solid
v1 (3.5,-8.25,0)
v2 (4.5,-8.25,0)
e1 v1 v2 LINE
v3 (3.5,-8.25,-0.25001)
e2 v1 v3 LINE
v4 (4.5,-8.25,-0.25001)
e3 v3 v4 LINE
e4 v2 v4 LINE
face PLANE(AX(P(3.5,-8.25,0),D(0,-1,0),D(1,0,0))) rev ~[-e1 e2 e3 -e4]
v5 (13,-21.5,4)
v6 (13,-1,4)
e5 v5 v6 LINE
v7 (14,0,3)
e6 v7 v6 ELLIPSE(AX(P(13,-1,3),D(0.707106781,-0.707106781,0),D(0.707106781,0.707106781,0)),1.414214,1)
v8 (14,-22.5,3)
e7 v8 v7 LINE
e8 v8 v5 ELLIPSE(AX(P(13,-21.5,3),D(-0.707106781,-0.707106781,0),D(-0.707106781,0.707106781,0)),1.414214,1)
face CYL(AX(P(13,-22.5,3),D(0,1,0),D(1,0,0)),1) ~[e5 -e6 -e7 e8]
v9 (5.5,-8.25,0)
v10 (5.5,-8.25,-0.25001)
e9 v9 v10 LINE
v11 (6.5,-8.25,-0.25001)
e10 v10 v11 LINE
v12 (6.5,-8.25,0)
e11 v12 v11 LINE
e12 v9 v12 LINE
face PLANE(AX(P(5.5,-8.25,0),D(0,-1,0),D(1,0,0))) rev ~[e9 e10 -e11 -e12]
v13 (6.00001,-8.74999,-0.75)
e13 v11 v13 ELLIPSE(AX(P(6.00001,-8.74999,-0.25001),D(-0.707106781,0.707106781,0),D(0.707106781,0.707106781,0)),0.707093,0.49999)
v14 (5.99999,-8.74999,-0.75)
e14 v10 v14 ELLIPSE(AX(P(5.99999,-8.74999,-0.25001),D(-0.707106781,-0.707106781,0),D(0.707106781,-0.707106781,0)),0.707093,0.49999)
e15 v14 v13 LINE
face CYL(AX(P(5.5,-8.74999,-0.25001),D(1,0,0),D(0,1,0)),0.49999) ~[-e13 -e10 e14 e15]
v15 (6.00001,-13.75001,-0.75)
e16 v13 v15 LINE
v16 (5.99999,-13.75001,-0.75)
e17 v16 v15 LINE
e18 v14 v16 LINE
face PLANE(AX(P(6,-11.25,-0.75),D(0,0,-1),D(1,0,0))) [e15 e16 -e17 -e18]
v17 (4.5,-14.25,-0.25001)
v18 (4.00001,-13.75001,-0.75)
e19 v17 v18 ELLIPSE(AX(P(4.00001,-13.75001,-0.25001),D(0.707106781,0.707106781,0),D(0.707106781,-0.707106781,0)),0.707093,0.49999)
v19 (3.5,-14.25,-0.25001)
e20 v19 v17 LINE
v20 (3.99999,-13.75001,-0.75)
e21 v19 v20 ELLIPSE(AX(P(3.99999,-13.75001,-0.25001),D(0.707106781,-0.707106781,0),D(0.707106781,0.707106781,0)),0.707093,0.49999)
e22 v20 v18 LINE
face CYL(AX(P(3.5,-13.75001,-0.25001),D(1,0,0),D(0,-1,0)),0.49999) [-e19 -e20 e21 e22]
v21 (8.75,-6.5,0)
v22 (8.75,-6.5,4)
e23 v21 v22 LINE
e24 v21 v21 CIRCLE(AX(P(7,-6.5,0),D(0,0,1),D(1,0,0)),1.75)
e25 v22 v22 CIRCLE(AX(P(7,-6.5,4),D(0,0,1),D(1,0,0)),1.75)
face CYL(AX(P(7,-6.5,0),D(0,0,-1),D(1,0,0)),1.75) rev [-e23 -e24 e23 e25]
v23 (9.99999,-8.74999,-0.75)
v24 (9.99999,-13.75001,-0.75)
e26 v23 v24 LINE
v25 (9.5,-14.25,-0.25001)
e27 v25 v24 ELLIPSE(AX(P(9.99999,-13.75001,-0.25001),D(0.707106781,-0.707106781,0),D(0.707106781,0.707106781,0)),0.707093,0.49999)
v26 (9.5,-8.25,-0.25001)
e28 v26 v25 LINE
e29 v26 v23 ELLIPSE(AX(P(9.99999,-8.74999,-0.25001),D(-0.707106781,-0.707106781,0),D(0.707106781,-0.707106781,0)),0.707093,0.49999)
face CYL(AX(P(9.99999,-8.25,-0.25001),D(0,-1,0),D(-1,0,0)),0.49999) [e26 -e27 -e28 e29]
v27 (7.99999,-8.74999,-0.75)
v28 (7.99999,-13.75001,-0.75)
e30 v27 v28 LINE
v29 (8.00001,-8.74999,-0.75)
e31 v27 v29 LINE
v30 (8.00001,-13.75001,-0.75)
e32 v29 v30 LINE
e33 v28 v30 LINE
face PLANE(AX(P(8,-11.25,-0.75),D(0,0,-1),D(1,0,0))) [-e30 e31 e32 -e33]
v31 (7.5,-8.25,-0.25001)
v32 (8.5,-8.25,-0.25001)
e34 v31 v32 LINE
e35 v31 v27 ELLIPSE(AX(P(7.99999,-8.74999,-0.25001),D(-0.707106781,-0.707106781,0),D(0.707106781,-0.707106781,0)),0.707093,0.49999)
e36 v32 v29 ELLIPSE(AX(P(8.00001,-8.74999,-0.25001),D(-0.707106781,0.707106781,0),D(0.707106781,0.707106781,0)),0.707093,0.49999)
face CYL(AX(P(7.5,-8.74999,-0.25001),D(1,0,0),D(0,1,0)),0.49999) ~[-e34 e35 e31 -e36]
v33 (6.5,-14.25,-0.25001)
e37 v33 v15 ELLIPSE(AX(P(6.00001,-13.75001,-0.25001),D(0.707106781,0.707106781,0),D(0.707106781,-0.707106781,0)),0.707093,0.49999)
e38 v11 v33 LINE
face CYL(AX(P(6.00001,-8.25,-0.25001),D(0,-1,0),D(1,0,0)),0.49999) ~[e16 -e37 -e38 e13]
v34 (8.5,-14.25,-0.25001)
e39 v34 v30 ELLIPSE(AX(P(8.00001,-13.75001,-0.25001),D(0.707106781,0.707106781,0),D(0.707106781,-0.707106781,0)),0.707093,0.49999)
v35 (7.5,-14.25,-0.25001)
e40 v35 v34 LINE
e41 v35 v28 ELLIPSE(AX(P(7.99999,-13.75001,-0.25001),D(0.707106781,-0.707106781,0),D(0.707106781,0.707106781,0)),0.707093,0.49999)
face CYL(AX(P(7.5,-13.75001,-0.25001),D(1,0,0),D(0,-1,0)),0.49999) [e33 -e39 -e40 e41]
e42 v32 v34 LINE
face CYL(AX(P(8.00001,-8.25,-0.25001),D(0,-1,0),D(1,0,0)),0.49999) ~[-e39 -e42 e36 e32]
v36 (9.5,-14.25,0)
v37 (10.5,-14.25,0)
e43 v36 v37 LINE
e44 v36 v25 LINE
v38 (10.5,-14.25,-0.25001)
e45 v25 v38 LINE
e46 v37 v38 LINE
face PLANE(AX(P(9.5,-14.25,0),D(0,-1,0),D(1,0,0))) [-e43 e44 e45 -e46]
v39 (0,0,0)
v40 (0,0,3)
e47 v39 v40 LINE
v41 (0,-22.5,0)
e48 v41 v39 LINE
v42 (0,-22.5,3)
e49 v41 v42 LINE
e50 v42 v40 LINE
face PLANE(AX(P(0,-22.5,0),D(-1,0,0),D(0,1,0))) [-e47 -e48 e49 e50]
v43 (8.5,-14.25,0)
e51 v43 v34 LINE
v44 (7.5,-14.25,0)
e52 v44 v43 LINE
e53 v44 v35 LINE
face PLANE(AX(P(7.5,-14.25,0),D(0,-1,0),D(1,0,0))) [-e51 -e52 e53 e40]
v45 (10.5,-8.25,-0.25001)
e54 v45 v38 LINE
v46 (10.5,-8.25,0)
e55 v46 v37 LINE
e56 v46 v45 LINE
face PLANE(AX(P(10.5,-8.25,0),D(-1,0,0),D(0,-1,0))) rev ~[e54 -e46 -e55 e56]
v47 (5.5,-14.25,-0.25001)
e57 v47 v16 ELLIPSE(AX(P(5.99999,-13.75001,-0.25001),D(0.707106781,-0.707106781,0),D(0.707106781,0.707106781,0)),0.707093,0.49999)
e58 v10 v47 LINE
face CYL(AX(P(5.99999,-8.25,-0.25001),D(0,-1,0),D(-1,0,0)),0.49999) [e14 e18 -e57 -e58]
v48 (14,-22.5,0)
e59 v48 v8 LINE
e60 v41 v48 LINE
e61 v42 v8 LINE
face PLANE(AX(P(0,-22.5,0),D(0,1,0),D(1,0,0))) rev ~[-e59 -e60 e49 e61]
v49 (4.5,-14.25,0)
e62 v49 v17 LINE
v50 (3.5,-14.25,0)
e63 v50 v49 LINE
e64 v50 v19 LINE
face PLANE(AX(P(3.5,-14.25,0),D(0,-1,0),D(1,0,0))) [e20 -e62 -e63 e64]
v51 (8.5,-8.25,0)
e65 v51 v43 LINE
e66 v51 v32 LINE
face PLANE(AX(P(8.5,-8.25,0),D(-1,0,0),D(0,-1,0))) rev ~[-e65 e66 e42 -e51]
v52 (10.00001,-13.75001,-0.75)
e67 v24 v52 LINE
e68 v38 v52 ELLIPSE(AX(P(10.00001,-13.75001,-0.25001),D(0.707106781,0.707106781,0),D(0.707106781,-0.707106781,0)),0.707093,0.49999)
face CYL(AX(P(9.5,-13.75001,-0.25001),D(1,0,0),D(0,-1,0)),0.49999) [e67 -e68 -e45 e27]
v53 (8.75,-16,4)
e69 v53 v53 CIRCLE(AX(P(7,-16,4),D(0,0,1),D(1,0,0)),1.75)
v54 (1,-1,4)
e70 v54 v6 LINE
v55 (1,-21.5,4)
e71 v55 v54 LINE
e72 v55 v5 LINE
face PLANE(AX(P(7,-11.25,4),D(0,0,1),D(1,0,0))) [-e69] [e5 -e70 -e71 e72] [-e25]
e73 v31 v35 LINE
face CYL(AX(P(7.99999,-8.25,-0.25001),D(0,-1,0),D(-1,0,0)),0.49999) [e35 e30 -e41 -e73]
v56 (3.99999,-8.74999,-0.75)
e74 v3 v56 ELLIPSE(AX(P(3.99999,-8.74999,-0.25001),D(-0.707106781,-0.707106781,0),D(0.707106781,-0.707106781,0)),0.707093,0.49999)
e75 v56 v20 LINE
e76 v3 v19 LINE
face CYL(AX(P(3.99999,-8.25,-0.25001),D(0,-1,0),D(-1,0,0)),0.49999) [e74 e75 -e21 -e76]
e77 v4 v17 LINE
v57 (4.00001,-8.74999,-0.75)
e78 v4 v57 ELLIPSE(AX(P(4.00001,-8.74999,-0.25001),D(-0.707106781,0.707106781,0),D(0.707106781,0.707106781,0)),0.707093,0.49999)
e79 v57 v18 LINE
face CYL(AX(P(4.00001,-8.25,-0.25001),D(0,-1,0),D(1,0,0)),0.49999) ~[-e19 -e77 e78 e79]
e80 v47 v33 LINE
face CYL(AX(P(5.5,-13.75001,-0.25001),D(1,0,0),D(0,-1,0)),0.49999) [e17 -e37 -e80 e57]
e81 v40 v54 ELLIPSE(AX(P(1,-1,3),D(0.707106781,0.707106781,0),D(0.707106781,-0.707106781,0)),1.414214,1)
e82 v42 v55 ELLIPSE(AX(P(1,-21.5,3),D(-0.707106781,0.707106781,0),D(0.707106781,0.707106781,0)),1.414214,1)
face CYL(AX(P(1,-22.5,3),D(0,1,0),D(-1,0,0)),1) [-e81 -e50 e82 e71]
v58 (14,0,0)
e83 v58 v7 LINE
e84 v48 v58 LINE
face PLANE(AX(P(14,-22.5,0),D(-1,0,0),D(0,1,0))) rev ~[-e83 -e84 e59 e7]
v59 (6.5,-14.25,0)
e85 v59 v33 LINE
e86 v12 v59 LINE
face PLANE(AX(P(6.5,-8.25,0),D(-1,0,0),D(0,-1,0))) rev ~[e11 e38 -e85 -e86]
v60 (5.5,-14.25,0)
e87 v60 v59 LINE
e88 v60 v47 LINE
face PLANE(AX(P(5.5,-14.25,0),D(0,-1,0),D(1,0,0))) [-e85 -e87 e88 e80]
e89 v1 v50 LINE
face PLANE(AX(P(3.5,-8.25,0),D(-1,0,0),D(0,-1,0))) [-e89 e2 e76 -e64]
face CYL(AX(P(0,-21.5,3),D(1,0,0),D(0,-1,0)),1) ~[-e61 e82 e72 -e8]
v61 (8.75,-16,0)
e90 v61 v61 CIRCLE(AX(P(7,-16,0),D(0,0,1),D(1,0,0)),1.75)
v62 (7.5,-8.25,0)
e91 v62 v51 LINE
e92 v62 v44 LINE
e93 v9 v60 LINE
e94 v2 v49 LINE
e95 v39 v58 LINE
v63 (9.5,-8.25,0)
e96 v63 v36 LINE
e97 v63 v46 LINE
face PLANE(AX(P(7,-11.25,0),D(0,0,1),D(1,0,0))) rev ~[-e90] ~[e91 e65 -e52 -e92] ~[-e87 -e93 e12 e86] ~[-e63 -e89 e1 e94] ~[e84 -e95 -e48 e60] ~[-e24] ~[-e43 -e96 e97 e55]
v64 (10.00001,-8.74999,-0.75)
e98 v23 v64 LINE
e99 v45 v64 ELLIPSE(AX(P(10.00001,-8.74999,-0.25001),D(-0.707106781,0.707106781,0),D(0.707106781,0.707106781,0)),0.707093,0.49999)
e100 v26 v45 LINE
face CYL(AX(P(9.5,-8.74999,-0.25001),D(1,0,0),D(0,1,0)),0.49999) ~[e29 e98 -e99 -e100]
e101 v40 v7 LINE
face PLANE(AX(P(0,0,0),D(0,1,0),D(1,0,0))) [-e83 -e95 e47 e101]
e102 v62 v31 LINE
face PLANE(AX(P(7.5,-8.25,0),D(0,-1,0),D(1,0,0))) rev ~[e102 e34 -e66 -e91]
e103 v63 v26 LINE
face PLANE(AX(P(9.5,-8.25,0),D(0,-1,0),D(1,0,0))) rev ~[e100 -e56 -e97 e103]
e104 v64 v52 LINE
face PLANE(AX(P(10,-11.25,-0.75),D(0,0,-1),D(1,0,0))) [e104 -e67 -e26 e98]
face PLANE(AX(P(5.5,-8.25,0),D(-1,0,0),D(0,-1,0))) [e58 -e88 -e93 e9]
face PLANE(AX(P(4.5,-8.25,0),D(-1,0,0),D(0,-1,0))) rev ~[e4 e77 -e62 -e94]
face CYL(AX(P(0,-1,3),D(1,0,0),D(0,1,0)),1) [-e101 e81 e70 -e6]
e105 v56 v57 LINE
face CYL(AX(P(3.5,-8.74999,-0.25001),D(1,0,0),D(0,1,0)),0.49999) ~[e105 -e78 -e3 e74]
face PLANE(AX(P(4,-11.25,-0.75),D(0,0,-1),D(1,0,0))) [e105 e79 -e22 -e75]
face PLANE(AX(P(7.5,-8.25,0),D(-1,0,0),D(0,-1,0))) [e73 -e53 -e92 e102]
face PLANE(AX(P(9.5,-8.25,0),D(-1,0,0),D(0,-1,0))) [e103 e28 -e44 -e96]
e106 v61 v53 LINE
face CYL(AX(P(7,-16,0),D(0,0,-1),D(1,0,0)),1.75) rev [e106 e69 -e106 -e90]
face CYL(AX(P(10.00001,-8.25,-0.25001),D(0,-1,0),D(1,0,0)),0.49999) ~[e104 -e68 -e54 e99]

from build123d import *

# Parameters (mm, degrees)
F0_W     = 14
F0_H     = 22.5
F0_R     = 1.75
F1_DEPTH = 4
F2_R     = 1
F3_W     = 1
F3_H     = 6
F4_DEPTH = 0.75
F5_R     = 0.49999


# Not quite as in the source:
# - a fillet or chamfer is up to 0.001 mm smaller than in the source, because OpenCascade refuses the exact size


with BuildPart() as f1:
    # F0 (on Top) → F1 (new body)
    with BuildSketch(Plane.XY):
        with Locations((7, -11.25)):
            Rectangle(F0_W, F0_H)
        with Locations((7, -16)):
            Circle(F0_R, mode=Mode.SUBTRACT)
        with Locations((7, -6.5)):
            Circle(F0_R, mode=Mode.SUBTRACT)
    extrude(amount=F1_DEPTH)

    # F2
    f2_edges = [f1.edges().sort_by_distance(p)[0] for p in [
        (7, 0, 4),
        (0, -11.25, 4),
        (14, -11.25, 4),
        (7, -22.5, 4),
    ]]
    fillet(f2_edges, radius=F2_R)

    # F3 (on face) → F4 (join)
    with BuildSketch(Plane(origin=(0, 0, 0), x_dir=(1, 0, 0), z_dir=(0, 0, -1))):
        with Locations((4, 11.25)):
            Rectangle(F3_W, F3_H)
        with Locations((6, 11.25)):
            Rectangle(F3_W, F3_H)
        with Locations((8, 11.25)):
            Rectangle(F3_W, F3_H)
        with Locations((10, 11.25)):
            Rectangle(F3_W, F3_H)
    extrude(amount=F4_DEPTH)

    # F5 (radius 0.5 in the source; OpenCascade refuses exactly that, so slightly less here)
    f5_edges = [f1.edges().sort_by_distance(p)[0] for p in [
        (10, -8.25, -0.75),
        (10.5, -11.25, -0.75),
        (10, -14.25, -0.75),
        (9.5, -11.25, -0.75),
        (8, -8.25, -0.75),
        (8.5, -11.25, -0.75),
        (8, -14.25, -0.75),
        (7.5, -11.25, -0.75),
        (6, -8.25, -0.75),
        (6.5, -11.25, -0.75),
        (6, -14.25, -0.75),
        (5.5, -11.25, -0.75),
        (4, -8.25, -0.75),
        (4.5, -11.25, -0.75),
        (4, -14.25, -0.75),
        (3.5, -11.25, -0.75),
    ]]
    fillet(f5_edges, radius=F5_R)


solid = f1.part
